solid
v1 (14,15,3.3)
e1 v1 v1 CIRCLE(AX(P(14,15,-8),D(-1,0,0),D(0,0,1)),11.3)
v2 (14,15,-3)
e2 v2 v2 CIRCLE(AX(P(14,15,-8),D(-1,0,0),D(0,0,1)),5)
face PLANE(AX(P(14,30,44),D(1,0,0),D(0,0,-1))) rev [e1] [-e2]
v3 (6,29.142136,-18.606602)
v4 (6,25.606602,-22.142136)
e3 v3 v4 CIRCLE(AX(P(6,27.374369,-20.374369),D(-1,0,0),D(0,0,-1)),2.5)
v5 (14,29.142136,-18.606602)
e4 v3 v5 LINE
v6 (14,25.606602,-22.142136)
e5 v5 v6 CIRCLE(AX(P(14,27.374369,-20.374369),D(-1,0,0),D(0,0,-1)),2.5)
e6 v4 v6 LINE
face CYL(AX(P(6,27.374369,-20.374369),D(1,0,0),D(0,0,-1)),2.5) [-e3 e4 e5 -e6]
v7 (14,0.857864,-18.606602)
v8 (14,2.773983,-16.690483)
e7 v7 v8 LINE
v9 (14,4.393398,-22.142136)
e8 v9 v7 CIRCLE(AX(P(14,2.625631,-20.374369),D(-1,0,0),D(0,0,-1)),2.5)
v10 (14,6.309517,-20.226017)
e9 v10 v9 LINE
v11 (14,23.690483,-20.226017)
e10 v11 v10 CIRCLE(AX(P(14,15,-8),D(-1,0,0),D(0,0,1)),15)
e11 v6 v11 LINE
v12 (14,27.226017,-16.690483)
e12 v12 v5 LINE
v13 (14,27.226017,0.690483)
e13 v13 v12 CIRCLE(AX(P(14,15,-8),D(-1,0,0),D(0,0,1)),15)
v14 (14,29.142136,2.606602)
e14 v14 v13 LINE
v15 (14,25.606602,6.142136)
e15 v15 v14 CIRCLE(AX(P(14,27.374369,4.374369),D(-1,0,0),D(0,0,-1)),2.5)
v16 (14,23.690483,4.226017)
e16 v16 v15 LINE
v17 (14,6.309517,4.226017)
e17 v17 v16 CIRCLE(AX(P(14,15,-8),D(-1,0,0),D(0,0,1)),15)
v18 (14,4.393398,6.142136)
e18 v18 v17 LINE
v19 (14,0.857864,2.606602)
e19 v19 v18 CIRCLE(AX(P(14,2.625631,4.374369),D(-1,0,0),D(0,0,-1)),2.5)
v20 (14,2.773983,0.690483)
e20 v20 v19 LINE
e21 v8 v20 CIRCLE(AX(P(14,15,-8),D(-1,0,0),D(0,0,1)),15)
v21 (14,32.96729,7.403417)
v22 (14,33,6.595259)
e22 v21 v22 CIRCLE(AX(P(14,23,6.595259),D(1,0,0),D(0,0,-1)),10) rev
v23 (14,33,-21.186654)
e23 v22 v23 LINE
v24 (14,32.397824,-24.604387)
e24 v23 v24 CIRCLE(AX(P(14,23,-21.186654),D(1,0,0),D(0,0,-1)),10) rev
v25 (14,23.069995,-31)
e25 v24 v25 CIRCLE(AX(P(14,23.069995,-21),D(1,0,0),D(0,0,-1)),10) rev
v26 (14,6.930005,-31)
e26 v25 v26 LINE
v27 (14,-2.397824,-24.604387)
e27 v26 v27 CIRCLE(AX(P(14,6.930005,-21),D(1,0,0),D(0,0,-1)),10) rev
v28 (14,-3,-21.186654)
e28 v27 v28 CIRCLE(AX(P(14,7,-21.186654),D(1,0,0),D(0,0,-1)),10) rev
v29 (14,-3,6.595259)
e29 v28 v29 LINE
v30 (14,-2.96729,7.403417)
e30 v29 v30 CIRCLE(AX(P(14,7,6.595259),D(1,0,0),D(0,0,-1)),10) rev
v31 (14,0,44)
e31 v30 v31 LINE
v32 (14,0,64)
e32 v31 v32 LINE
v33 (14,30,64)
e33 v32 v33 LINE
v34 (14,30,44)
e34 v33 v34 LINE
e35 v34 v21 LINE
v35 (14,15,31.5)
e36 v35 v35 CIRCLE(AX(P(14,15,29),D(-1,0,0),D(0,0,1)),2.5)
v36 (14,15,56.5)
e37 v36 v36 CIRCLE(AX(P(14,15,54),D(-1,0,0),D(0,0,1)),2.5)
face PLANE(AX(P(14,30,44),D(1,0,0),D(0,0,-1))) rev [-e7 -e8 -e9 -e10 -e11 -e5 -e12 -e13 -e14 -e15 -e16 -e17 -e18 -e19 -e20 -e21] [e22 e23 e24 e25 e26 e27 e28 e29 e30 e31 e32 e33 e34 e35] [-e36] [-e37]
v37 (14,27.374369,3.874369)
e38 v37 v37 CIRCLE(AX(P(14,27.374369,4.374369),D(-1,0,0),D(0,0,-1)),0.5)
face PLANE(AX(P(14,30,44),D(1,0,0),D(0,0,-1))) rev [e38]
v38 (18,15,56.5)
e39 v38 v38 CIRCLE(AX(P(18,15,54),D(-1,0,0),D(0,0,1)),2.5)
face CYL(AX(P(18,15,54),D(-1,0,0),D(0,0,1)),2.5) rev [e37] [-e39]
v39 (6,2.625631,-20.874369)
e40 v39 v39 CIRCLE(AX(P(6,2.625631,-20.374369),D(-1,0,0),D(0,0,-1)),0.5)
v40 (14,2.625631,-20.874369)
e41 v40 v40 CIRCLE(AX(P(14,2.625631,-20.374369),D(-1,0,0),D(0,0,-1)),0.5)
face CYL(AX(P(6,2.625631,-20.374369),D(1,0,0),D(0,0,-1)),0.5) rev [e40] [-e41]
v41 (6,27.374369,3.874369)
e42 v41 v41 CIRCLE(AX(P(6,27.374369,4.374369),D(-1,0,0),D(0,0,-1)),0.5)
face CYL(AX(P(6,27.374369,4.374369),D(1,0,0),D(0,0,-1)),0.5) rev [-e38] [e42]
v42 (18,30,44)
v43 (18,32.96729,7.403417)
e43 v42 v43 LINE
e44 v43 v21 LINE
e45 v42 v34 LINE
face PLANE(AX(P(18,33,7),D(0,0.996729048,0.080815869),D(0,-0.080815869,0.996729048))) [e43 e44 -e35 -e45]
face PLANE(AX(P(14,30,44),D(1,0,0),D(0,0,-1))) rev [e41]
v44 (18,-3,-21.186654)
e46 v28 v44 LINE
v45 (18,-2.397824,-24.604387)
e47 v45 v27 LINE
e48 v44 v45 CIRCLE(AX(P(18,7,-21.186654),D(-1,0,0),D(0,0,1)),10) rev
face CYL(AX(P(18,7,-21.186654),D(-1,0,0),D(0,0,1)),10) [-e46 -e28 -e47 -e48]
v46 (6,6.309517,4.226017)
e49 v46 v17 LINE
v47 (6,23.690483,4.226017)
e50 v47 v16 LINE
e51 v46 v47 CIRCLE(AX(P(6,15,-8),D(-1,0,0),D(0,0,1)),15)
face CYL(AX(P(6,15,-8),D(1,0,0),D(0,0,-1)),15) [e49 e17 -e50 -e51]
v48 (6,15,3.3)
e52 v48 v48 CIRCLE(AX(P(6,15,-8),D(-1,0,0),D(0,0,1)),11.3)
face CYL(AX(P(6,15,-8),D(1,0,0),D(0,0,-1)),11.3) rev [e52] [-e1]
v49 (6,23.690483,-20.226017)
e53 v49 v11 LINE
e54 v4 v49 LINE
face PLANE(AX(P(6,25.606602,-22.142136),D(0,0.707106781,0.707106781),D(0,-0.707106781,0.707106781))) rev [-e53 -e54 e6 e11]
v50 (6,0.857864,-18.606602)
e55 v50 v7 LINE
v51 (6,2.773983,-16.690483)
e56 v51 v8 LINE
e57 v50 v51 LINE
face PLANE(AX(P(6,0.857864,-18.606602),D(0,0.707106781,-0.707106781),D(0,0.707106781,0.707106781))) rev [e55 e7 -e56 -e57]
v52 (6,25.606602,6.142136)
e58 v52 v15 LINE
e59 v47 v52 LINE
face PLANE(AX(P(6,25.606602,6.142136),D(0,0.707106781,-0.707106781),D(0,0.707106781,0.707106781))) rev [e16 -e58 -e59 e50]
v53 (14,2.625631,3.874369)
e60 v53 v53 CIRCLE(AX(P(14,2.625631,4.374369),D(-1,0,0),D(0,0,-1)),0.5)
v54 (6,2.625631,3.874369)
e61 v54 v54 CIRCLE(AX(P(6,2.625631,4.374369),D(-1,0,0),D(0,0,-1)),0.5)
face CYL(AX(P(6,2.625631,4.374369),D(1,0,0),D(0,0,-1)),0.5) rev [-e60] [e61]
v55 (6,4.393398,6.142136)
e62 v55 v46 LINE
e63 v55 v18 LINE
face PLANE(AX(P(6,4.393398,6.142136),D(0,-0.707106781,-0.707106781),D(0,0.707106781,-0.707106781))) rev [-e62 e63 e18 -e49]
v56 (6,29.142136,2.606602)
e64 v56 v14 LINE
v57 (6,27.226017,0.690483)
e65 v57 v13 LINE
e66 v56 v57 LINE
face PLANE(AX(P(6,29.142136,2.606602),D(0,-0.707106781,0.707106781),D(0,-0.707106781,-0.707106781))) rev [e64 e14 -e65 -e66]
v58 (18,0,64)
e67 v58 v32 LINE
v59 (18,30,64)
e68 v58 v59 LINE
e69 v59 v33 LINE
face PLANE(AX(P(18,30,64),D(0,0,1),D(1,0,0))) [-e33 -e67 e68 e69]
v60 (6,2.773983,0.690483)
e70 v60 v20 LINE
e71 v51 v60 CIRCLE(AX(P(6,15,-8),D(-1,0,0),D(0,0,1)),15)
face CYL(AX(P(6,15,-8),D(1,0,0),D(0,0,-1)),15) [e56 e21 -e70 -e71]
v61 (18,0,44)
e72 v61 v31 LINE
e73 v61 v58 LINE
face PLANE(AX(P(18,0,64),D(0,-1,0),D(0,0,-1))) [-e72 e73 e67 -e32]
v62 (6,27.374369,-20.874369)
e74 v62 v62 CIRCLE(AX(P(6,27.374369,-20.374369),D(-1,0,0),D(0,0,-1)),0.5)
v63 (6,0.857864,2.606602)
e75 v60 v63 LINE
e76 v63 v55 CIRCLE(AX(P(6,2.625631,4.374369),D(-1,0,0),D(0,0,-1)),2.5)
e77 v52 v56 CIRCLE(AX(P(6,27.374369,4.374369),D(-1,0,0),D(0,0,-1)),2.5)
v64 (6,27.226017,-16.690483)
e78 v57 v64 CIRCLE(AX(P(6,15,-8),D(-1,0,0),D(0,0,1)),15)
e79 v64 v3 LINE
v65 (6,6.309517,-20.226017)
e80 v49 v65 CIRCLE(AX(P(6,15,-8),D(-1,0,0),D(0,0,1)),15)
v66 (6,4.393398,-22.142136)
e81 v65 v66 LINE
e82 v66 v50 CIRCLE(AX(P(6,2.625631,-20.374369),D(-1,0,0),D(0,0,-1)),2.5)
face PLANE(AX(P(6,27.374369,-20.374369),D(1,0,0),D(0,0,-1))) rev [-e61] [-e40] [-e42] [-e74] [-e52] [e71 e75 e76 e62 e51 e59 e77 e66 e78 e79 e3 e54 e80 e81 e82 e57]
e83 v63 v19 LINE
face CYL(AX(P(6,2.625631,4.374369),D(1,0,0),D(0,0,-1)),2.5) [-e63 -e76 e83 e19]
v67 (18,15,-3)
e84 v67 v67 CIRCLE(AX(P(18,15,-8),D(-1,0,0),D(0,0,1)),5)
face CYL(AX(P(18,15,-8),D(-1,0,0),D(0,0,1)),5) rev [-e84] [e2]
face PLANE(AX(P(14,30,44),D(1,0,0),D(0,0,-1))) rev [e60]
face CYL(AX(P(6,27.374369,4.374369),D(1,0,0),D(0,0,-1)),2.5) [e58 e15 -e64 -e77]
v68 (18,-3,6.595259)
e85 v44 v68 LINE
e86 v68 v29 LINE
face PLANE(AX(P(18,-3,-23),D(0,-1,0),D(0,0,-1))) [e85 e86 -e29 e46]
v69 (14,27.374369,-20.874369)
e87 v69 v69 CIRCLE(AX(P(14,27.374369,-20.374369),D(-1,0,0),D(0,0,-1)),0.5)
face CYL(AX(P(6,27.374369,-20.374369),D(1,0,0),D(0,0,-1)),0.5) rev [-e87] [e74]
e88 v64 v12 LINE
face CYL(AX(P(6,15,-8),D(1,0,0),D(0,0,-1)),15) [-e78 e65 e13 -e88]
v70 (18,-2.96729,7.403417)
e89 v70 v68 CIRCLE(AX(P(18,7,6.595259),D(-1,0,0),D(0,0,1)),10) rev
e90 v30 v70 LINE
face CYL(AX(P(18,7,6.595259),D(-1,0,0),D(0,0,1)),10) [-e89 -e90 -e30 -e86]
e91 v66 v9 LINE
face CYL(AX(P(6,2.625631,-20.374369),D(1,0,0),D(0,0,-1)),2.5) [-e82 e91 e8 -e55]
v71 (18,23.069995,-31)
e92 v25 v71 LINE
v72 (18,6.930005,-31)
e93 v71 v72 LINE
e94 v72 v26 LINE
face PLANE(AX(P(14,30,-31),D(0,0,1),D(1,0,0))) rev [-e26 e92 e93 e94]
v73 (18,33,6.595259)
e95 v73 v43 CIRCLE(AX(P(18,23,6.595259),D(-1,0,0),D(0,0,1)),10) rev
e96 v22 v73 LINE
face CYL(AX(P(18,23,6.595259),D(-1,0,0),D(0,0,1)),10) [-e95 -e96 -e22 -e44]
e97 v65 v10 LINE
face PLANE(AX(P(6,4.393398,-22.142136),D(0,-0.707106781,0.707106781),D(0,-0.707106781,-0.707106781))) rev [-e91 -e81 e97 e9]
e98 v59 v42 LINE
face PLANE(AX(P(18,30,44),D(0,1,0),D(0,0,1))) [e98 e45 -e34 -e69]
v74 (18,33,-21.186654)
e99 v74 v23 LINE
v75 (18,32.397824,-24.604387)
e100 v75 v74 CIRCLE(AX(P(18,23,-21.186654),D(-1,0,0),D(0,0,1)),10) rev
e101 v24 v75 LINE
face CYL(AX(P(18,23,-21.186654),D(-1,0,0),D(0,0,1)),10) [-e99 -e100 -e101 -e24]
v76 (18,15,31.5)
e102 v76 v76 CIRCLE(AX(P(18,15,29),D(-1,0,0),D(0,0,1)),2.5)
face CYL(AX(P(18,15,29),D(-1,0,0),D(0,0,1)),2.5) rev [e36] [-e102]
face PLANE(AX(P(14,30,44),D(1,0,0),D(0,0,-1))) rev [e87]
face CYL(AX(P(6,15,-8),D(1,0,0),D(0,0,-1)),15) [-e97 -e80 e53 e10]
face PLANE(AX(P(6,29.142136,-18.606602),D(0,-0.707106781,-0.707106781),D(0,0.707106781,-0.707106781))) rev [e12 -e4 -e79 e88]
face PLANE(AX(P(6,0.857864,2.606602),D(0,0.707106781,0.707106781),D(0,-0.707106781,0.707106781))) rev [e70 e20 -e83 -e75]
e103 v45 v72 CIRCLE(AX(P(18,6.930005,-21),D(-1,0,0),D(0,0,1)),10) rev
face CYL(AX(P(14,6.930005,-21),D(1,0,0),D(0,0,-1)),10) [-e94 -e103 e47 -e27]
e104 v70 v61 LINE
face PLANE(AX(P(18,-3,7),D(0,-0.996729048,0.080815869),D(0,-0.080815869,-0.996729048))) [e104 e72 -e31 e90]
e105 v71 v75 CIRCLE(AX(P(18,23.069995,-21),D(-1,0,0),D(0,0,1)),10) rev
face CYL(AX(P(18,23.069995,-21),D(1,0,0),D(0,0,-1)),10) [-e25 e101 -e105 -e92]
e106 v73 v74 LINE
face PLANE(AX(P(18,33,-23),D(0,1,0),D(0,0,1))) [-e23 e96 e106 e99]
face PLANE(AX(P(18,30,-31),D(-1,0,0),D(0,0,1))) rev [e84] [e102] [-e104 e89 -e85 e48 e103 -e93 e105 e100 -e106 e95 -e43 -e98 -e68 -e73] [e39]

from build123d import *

# Parameters (mm, degrees)
SKETCH1_W           = 4
SKETCH1_H           = 75
BOSS_EXTRUDE1_DEPTH = 30
SKETCH4_R           = 0.5
SKETCH4_R_2         = 11.3
BOSS_EXTRUDE2_DEPTH = 8
BOSS_EXTRUDE3_DEPTH = 4
FILLET1_R           = 10
SKETCH9_R           = 2.5
SKETCH9_R_2         = 5
CUT_EXTRUDE2_DEPTH  = 4


with BuildPart() as part:
    # Sketch1 → Boss-Extrude1 (new body)
    with BuildSketch(Plane(origin=(0, 0, 0), x_dir=(1, 0, 0), z_dir=(0, 1, 0))):
        with Locations((16, -6.5)):
            Rectangle(SKETCH1_W, SKETCH1_H)
    extrude(amount=BOSS_EXTRUDE1_DEPTH)

    # Sketch4 → Boss-Extrude2 (add)
    with BuildSketch(Plane.ZY.offset(-14)):
        with BuildLine():
            Line((-22.142135624, 25.606601718), (-20.226017285, 23.690483379))
            ThreePointArc((-20.226017285, 23.690483379), (-23, 15), (-20.226017285, 6.309516621))
            Line((-20.226017285, 6.309516621), (-22.142135624, 4.393398282))
            ThreePointArc((-22.142135624, 4.393398282), (-22.142135624, 0.857864376), (-18.606601718, 0.857864376))
            Line((-18.606601718, 0.857864376), (-16.690483379, 2.773982715))
            ThreePointArc((-16.690483379, 2.773982715), (-8, 0), (0.690483379, 2.773982715))
            Line((0.690483379, 2.773982715), (2.606601718, 0.857864376))
            ThreePointArc((2.606601718, 0.857864376), (6.142135624, 0.857864376), (6.142135624, 4.393398282))
            Line((6.142135624, 4.393398282), (4.226017285, 6.309516621))
            ThreePointArc((4.226017285, 6.309516621), (7, 15), (4.226017285, 23.690483379))
            Line((4.226017285, 23.690483379), (6.142135624, 25.606601718))
            ThreePointArc((6.142135624, 25.606601718), (6.142135624, 29.142135624), (2.606601718, 29.142135624))
            Line((2.606601718, 29.142135624), (0.690483379, 27.226017285))
            ThreePointArc((0.690483379, 27.226017285), (-8, 30), (-16.690483379, 27.226017285))
            Line((-16.690483379, 27.226017285), (-18.606601718, 29.142135624))
            ThreePointArc((-18.606601718, 29.142135624), (-22.142135624, 29.142135624), (-22.142135624, 25.606601718))
        make_face()
        with Locations(Location((-20.374368671, 27.374368671, 0), (0, 0, 180))):
            Circle(SKETCH4_R, mode=Mode.SUBTRACT)
        with Locations((-8, 15)):
            Circle(SKETCH4_R_2, mode=Mode.SUBTRACT)
        with Locations(Location((4.374368671, 27.374368671, 0), (0, 0, 180))):
            Circle(SKETCH4_R, mode=Mode.SUBTRACT)
        with Locations(Location((4.374368671, 2.625631329, 0), (0, 0, 180))):
            Circle(SKETCH4_R, mode=Mode.SUBTRACT)
        with Locations(Location((-20.374368671, 2.625631329, 0), (0, 0, 180))):
            Circle(SKETCH4_R, mode=Mode.SUBTRACT)
    extrude(amount=BOSS_EXTRUDE2_DEPTH)

    # Sketch5 → Boss-Extrude3 (add)
    with BuildSketch(Plane.ZY.offset(-14)):
        Polygon((-31, 0), (-23, -3), (7, -3), (44, 0), (64, 0), (64, 30), (44, 30), (7, 33), (-23, 33), (-31, 30), align=None)
    extrude(amount=-BOSS_EXTRUDE3_DEPTH)

    # Fillet1
    # the kernel refuses this fillet: 10 mm, written as the material it takes off along each edge
    with BuildSketch(Plane(origin=(-3.325011704, 30, -31), x_dir=(0, 0.3511234415883908, 0.9363291775690449), z_dir=(1, 0, 0))) as fillet1_piece_1:
        with BuildLine():
            CenterArc((FILLET1_R * 0.693000468165, FILLET1_R), FILLET1_R, 200.55604522, 69.44395478)
            Line((-FILLET1_R * 0.243328709404, FILLET1_R * 0.648876558412), (0, 0))
            Line((0, 0), (FILLET1_R * 0.693000468165, 0))
        make_face()
    extrude(amount=38.650023408, mode=Mode.SUBTRACT)
    with BuildSketch(Plane(origin=(-3.325011704, 0, -31), x_dir=(0, -0.3511234415883923, 0.9363291775690443), z_dir=(1, 0, 0))) as fillet1_piece_2:
        with BuildLine():
            CenterArc((FILLET1_R * 0.693000468165, -FILLET1_R), FILLET1_R, 90, 69.44395478)
            Line((-FILLET1_R * 0.243328709404, -FILLET1_R * 0.648876558412), (0, 0))
            Line((0, 0), (FILLET1_R * 0.693000468165, 0))
        make_face()
    extrude(amount=38.650023408, mode=Mode.SUBTRACT)
    with BuildSketch(Plane(origin=(12.988146779, 33, 7), x_dir=(0, -0.0808158687660647, 0.9967290481146751), z_dir=(1, 0, 0)), Plane(origin=(12.988146779, -3, 7), x_dir=(0, 0, -1), z_dir=(1, 0, 0))) as fillet1_piece_3:
        with BuildLine():
            CenterArc((FILLET1_R * 0.0404741288471, FILLET1_R), FILLET1_R, 265.364536573, 4.635463427)
            Line((-FILLET1_R * 0.040341739919, FILLET1_R * 0.00327095188532), (0, 0))
            Line((0, 0), (FILLET1_R * 0.0404741288471, 0))
        make_face()
    extrude(amount=6.023706442, mode=Mode.SUBTRACT)
    with BuildSketch(Plane(origin=(9.466635456, 33, -23), x_dir=(0, 0, 1), z_dir=(1, 0, 0)), Plane(origin=(9.466635456, -3, -23), x_dir=(0, 0.35112344158839215, -0.9363291775690443), z_dir=(1, 0, 0))) as fillet1_piece_4:
        with BuildLine():
            CenterArc((FILLET1_R * 0.181334581773, FILLET1_R), FILLET1_R, 249.44395478, 20.55604522)
            Line((-FILLET1_R * 0.169788859816, FILLET1_R * 0.063670822431), (0, 0))
            Line((0, 0), (FILLET1_R * 0.181334581773, 0))
        make_face()
    extrude(amount=13.066729089, mode=Mode.SUBTRACT)

    # Sketch9 → Cut-Extrude2 (cut)
    with BuildSketch(Plane.ZY.offset(-14)):
        with Locations((54, 15)):
            Circle(SKETCH9_R)
        with Locations((29, 15)):
            Circle(SKETCH9_R)
        with Locations((-8, 15)):
            Circle(SKETCH9_R_2)
    extrude(amount=-CUT_EXTRUDE2_DEPTH, mode=Mode.SUBTRACT)


solid = part.part
